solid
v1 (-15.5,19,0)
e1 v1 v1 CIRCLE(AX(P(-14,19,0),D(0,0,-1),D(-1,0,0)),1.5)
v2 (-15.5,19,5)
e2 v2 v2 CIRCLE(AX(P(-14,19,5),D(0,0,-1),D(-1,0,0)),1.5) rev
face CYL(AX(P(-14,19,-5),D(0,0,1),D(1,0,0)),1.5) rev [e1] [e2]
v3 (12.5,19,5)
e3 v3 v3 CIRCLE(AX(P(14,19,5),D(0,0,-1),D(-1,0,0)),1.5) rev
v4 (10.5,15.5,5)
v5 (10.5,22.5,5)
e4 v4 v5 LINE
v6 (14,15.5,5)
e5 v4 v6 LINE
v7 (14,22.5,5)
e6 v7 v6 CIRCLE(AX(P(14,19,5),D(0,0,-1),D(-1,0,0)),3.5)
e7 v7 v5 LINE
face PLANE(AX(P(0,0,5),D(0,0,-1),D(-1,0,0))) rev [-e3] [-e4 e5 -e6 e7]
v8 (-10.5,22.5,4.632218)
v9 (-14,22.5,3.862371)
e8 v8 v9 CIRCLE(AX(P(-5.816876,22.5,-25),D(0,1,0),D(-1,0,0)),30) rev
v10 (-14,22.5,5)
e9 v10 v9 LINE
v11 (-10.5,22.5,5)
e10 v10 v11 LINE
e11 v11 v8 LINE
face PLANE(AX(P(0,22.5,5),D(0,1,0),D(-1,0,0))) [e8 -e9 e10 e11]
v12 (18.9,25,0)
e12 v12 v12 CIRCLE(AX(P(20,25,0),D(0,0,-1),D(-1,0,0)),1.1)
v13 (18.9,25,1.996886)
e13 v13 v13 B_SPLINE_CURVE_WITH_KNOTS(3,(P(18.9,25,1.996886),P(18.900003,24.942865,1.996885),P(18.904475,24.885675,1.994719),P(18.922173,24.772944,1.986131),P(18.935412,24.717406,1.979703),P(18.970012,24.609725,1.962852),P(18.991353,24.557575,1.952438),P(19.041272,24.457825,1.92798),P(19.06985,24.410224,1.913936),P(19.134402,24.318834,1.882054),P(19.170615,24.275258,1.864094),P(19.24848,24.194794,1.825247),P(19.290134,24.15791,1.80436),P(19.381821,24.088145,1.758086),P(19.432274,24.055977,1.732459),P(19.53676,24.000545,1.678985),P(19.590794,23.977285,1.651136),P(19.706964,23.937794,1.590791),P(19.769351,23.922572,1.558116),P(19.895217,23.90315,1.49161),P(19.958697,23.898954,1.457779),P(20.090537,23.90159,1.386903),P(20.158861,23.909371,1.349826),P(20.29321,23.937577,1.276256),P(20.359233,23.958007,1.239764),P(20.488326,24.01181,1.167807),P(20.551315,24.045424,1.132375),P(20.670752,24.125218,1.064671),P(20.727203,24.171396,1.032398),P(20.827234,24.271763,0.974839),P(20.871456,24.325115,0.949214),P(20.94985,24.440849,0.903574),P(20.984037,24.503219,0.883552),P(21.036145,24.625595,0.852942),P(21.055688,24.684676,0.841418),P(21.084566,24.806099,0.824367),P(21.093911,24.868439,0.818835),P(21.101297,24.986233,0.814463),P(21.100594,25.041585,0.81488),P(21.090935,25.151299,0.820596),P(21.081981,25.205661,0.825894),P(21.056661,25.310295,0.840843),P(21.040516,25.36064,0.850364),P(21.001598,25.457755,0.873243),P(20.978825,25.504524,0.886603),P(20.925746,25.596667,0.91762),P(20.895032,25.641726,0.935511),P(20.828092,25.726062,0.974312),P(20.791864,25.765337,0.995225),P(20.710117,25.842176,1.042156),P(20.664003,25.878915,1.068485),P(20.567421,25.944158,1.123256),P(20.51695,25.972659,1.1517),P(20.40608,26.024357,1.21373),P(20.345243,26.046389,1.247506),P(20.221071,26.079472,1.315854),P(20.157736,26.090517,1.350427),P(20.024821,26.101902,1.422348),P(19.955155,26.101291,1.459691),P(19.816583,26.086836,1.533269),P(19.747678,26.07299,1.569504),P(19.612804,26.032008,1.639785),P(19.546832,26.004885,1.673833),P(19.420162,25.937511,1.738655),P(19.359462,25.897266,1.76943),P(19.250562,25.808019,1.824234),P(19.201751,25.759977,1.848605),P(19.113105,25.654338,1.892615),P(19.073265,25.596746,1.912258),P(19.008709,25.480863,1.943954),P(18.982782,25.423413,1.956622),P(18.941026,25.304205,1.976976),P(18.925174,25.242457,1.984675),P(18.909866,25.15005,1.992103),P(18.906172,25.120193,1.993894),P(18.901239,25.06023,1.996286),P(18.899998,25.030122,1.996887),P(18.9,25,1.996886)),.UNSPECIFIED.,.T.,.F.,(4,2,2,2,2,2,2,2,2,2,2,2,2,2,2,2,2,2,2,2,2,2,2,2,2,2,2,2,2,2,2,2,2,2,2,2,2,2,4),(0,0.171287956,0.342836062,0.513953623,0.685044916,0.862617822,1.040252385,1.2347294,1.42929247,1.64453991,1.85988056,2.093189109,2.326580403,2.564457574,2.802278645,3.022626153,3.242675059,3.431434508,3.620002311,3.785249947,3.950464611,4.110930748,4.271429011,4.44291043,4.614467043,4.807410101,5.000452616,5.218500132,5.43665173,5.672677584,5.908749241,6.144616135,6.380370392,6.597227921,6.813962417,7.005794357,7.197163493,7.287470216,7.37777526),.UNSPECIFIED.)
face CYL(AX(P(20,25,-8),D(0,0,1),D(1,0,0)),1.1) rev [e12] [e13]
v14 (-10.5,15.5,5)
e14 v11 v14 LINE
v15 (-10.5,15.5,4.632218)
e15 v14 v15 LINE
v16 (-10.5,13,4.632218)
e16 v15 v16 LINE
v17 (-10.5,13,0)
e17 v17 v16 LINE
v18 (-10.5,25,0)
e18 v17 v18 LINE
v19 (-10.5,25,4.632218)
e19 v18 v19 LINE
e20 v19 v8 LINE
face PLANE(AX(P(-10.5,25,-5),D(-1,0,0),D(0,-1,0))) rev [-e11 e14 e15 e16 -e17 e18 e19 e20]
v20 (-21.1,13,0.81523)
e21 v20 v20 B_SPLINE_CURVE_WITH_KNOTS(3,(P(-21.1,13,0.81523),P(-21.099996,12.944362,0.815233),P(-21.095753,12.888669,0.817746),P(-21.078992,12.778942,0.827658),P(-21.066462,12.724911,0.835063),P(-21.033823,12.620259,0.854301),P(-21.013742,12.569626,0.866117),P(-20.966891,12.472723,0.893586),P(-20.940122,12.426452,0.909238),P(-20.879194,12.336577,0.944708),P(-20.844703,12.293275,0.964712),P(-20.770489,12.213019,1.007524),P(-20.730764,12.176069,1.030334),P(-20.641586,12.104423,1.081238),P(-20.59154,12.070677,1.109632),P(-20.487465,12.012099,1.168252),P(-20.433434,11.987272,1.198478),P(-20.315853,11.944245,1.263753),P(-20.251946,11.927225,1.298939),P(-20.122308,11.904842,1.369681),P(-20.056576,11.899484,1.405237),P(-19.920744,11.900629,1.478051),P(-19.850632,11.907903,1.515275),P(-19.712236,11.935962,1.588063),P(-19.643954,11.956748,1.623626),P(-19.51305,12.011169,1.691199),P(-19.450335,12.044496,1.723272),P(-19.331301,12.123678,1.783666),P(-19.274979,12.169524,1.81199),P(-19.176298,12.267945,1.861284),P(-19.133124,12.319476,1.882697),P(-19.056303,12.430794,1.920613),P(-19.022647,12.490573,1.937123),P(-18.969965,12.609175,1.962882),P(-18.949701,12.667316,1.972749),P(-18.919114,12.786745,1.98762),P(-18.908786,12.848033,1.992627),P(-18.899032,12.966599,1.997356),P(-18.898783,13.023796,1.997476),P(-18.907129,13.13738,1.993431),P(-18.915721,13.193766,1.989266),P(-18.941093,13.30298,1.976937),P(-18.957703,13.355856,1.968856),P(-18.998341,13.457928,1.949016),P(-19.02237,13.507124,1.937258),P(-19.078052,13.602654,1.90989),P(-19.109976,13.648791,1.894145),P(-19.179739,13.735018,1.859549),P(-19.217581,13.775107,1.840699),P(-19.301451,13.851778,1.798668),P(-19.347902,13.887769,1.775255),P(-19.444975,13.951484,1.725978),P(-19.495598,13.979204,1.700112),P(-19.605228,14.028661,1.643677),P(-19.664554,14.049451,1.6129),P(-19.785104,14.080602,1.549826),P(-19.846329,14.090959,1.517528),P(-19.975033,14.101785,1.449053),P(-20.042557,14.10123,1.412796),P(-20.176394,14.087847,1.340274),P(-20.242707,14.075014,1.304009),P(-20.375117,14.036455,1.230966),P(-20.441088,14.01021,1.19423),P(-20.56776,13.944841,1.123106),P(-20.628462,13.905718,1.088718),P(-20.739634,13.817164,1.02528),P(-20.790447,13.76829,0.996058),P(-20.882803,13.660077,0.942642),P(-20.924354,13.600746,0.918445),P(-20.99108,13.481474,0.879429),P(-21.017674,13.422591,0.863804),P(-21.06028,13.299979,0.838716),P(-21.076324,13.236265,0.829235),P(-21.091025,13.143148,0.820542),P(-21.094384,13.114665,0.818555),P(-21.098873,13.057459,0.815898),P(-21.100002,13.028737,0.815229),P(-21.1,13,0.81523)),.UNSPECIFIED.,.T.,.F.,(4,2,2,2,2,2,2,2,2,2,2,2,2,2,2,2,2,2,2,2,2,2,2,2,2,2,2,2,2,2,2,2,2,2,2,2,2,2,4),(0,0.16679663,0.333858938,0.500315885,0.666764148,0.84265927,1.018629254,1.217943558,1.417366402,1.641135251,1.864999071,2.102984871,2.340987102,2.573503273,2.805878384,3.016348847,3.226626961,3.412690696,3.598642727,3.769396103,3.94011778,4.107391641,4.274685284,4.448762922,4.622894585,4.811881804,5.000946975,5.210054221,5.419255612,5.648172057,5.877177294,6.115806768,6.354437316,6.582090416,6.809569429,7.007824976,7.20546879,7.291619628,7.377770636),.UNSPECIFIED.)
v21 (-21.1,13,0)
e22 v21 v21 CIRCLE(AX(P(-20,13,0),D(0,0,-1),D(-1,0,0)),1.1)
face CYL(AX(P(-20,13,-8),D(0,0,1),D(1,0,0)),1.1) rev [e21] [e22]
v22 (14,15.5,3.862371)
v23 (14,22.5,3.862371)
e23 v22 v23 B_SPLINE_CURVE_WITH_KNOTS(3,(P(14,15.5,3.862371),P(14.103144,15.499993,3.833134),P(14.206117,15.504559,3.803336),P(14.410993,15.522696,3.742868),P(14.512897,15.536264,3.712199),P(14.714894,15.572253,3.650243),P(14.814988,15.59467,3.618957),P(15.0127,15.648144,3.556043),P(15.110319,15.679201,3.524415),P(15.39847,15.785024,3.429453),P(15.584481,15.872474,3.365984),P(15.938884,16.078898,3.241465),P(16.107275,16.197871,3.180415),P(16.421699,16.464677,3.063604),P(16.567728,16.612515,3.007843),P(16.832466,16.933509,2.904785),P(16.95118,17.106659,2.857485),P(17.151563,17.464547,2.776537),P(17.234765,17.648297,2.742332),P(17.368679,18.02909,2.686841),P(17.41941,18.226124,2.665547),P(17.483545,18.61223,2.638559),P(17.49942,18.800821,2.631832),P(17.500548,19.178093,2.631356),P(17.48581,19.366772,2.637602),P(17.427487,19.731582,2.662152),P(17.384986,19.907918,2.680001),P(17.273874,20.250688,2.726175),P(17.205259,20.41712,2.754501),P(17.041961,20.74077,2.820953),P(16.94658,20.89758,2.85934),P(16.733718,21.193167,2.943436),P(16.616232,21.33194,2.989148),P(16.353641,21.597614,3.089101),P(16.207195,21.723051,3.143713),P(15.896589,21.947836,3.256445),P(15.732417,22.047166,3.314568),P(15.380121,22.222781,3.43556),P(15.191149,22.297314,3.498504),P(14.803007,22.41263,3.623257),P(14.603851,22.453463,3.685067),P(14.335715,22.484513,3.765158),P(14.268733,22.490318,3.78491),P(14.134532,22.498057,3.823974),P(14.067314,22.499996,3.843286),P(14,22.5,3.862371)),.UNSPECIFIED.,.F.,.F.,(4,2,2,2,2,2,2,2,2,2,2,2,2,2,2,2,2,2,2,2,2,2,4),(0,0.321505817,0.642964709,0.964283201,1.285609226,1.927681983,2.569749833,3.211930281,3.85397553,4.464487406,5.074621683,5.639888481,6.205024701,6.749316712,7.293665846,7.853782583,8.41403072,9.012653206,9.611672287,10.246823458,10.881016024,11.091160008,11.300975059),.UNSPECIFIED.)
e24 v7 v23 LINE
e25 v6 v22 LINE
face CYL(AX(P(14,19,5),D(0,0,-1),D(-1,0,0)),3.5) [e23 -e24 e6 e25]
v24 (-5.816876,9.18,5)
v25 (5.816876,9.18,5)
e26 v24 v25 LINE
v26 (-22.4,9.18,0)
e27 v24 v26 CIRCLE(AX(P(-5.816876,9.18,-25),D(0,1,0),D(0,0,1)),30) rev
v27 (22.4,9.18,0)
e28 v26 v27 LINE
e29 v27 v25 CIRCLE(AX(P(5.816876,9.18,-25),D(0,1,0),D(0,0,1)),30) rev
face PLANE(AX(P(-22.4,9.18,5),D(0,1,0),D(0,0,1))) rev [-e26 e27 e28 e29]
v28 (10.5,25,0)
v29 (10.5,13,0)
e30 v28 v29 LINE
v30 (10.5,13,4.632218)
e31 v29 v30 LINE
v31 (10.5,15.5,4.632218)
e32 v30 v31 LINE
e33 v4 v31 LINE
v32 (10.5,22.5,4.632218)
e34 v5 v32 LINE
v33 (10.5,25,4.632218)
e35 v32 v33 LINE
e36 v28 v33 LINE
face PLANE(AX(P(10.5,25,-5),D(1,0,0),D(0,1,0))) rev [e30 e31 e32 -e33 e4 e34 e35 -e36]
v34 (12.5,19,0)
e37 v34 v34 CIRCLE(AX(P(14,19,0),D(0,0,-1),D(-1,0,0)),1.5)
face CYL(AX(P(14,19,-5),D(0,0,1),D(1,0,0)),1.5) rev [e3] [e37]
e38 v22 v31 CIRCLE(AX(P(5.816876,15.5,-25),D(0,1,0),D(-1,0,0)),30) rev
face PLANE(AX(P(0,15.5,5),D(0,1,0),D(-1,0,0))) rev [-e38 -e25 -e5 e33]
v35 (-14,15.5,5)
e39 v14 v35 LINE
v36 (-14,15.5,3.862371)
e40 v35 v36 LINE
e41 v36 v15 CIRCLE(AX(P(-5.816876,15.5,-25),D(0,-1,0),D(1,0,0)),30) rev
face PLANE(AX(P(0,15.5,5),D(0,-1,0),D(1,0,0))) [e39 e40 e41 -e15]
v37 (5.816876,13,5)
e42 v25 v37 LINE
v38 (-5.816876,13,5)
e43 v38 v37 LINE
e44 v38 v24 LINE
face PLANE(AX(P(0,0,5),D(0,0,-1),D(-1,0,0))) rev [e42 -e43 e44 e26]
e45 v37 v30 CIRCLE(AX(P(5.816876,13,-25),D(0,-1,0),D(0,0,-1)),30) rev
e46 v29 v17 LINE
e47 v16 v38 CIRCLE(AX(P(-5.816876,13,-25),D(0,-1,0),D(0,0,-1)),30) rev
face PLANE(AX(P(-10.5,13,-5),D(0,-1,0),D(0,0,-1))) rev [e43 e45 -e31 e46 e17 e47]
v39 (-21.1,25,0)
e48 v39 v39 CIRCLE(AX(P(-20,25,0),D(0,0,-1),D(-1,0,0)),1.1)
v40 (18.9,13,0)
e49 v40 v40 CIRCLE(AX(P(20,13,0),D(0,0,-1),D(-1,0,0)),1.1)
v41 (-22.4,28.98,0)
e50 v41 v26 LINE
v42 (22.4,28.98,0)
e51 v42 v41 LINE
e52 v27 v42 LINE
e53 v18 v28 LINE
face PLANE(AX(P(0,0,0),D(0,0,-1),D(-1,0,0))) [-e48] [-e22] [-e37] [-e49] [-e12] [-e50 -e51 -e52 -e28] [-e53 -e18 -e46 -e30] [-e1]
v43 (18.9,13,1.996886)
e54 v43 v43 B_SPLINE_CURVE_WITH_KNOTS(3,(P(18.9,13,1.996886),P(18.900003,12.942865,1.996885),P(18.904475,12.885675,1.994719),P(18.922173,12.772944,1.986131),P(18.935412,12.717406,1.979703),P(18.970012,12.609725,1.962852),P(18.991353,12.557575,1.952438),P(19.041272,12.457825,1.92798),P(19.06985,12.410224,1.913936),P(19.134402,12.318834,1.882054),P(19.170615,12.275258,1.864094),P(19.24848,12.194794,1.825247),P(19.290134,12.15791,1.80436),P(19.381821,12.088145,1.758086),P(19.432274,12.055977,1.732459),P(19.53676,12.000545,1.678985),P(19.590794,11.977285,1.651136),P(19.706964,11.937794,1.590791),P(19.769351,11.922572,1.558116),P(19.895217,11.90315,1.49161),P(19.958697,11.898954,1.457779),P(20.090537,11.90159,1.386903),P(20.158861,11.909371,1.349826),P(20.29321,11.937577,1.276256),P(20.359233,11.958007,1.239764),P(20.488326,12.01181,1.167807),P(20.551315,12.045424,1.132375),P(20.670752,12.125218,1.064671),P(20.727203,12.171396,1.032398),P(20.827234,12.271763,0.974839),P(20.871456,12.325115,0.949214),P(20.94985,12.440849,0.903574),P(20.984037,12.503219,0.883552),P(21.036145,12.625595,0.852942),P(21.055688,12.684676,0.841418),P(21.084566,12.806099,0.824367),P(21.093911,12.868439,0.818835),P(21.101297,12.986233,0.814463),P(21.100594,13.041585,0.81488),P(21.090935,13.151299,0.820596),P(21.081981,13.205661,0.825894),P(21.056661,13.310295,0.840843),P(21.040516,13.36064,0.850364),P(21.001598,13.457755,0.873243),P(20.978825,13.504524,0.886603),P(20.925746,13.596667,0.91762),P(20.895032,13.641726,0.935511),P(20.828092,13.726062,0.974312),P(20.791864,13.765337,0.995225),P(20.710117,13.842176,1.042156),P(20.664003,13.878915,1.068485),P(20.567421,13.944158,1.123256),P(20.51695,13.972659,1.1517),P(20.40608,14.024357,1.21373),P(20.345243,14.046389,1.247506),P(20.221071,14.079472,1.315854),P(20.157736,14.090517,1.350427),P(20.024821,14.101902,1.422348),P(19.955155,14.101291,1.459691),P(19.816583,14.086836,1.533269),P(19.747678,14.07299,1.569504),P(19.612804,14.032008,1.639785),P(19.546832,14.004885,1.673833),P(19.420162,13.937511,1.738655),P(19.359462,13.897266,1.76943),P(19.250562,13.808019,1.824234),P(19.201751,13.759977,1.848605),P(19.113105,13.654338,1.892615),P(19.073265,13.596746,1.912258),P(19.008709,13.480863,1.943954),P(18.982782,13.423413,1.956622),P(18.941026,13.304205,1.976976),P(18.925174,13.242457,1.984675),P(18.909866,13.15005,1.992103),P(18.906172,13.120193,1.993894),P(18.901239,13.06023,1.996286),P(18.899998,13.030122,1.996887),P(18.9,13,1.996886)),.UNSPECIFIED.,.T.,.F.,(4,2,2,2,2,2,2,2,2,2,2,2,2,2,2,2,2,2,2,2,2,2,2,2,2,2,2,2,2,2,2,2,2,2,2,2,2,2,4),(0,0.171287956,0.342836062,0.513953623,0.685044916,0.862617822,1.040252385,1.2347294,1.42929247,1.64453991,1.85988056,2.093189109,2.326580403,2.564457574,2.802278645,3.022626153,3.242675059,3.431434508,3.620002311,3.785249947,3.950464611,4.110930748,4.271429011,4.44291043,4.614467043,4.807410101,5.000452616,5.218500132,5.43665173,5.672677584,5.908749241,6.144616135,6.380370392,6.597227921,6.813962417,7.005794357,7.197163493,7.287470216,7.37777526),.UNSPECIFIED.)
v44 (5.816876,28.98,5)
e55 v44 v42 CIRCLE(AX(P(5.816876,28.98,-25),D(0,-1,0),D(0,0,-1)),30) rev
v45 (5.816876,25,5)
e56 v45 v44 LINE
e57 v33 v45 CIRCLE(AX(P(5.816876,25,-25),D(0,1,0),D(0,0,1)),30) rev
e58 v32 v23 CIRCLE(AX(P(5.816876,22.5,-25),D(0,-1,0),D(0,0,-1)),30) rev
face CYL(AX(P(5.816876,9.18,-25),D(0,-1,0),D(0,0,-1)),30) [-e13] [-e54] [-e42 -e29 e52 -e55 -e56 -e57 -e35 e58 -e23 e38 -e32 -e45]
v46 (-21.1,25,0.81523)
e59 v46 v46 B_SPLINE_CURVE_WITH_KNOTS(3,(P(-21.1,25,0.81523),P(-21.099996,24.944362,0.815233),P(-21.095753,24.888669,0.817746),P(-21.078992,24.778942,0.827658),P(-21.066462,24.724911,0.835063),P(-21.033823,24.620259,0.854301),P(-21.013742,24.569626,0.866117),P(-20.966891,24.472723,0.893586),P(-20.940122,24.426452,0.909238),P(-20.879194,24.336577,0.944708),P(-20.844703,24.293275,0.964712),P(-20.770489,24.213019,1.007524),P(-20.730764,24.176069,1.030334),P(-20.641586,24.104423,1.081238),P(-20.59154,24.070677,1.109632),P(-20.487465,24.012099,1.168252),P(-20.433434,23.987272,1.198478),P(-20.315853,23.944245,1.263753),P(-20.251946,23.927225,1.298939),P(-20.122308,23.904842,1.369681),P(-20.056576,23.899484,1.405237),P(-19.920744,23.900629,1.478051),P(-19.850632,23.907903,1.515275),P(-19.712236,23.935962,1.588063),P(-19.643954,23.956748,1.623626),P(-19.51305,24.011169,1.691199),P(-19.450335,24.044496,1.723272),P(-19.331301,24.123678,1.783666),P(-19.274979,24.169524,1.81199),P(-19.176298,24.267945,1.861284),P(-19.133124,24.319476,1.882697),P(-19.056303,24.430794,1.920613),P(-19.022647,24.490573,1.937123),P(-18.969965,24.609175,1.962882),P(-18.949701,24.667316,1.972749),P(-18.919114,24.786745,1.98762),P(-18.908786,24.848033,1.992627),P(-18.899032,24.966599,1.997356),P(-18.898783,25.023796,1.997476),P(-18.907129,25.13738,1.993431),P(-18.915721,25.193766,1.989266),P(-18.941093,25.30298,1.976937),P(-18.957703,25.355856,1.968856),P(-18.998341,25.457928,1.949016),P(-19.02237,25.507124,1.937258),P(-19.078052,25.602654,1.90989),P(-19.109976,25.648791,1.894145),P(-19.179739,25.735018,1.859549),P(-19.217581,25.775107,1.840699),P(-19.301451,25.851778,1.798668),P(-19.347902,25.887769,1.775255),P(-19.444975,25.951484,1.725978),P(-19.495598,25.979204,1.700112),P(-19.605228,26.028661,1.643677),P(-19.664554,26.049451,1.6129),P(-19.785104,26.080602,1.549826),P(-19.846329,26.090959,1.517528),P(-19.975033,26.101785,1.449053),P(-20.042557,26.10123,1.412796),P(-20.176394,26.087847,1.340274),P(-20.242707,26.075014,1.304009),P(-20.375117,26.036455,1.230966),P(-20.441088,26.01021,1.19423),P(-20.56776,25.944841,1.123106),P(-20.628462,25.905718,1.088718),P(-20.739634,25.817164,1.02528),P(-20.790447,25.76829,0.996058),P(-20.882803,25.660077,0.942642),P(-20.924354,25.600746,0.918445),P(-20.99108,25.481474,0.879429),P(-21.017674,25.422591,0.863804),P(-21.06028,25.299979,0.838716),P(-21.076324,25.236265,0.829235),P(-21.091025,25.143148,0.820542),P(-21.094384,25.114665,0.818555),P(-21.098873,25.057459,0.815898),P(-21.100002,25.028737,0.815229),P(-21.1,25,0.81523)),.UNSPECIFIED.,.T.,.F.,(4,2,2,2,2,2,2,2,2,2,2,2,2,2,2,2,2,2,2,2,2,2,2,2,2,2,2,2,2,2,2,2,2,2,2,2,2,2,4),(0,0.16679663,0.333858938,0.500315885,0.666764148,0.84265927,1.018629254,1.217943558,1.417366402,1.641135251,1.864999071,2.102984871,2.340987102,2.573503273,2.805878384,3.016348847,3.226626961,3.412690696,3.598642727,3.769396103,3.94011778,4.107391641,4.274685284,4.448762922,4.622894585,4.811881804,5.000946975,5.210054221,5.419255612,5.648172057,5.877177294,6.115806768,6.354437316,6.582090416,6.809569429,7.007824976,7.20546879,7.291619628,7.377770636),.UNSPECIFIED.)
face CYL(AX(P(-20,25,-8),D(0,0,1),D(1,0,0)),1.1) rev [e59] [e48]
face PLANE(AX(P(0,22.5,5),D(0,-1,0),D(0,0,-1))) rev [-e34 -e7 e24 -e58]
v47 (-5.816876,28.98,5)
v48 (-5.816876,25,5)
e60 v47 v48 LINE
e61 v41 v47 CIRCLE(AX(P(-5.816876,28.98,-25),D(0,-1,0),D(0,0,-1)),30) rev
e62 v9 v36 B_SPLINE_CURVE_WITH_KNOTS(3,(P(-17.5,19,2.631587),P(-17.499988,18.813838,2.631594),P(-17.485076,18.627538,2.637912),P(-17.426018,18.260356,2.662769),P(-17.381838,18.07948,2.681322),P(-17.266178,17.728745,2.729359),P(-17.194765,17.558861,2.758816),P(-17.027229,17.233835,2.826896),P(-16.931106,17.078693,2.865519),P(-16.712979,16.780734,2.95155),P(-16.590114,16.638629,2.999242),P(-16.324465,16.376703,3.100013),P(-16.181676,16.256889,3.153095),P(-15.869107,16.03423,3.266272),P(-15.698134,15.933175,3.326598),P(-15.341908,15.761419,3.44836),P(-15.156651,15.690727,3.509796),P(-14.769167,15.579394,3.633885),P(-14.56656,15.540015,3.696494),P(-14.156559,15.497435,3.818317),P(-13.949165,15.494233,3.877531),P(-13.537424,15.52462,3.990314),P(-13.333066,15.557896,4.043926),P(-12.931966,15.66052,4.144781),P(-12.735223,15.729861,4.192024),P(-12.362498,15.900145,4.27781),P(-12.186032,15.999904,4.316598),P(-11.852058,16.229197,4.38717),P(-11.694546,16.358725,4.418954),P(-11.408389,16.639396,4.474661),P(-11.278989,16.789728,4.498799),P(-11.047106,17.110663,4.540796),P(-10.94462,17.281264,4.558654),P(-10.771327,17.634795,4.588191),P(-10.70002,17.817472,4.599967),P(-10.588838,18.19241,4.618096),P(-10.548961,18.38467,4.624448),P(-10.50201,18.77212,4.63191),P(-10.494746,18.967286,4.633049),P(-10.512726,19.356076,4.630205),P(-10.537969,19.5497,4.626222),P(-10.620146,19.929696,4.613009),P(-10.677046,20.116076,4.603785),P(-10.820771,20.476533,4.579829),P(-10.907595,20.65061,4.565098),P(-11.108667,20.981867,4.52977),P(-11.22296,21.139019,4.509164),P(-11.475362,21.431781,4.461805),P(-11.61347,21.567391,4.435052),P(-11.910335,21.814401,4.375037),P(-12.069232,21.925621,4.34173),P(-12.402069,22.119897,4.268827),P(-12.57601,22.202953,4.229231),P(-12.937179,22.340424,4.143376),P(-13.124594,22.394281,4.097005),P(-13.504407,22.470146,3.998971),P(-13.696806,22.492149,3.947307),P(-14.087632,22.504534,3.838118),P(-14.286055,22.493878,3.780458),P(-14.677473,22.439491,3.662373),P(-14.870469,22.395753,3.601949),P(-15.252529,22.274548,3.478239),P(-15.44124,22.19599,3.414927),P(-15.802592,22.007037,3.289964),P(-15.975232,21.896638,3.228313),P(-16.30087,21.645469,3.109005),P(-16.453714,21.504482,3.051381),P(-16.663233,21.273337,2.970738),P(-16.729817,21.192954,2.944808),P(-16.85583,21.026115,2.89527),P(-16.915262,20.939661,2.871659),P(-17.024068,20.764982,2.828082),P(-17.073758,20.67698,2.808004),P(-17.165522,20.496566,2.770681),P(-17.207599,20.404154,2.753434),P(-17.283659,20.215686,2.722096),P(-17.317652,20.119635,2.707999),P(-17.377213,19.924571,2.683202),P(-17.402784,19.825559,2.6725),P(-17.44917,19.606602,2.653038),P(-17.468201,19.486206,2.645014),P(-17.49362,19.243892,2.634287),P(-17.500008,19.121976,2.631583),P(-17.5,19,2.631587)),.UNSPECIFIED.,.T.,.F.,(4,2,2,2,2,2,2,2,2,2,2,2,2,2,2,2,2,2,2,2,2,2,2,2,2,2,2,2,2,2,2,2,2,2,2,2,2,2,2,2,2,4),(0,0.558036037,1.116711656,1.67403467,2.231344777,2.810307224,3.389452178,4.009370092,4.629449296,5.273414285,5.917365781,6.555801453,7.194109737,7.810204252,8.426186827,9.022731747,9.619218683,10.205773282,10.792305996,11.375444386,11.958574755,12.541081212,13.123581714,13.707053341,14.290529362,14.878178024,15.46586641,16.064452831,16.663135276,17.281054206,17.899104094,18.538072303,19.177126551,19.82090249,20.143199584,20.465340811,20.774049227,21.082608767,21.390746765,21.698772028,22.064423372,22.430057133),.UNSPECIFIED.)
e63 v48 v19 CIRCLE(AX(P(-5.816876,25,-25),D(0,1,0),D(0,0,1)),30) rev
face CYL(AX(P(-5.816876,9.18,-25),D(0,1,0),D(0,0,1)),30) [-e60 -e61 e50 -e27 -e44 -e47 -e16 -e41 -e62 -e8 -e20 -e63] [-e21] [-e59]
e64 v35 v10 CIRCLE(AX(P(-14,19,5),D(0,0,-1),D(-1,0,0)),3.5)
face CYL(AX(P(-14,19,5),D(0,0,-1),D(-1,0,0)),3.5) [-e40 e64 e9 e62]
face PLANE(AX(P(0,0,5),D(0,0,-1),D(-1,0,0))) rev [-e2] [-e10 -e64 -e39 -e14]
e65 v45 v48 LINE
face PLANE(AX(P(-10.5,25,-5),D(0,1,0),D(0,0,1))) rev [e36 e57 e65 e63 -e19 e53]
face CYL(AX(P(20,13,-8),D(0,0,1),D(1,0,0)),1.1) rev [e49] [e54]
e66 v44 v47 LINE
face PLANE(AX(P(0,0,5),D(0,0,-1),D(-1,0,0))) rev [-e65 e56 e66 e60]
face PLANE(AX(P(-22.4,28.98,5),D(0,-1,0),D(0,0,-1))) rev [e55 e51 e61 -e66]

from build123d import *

# Parameters (mm, degrees)
SKETCH1_W           = 44.8
SKETCH1_H           = 19.8
BOSS_EXTRUDE1_DEPTH = 5
SKETCH2_R           = 1.1
CUT_EXTRUDE1_DEPTH  = 13
SKETCH3_R           = 1.5
CUT_EXTRUDE2_DEPTH  = 10
SKETCH4_W           = 21
SKETCH4_H           = 12
CUT_EXTRUDE3_DEPTH  = 10
FILLET1_START       = 9.18
FILLET1_DEPTH       = 19.8
BOSS_EXTRUDE2_START = -5
SKETCH5_R           = 3.5
SKETCH5_R_2         = 1.5
BOSS_EXTRUDE2_DEPTH = 5


with BuildPart() as part:
    # Sketch1 → Boss-Extrude1 (new body)
    with BuildSketch(Plane.XY):
        with Locations((0, 19.08)):
            Rectangle(SKETCH1_W, SKETCH1_H)
    extrude(amount=BOSS_EXTRUDE1_DEPTH)

    # Sketch2 → Cut-Extrude1 (cut)
    with BuildSketch(Plane.XY.offset(5)):
        with Locations((-20, 25)):
            Circle(SKETCH2_R)
        with Locations((-20, 13)):
            Circle(SKETCH2_R)
        with Locations((20, 25)):
            Circle(SKETCH2_R)
        with Locations((20, 13)):
            Circle(SKETCH2_R)
    extrude(amount=-CUT_EXTRUDE1_DEPTH, mode=Mode.SUBTRACT)

    # Sketch3 → Cut-Extrude2 (cut)
    with BuildSketch(Plane.XY.offset(5)):
        with Locations((-14, 19)):
            Circle(SKETCH3_R)
        with Locations((14, 19)):
            Circle(SKETCH3_R)
    extrude(amount=-CUT_EXTRUDE2_DEPTH, mode=Mode.SUBTRACT)

    # Sketch4 → Cut-Extrude3 (cut)
    with BuildSketch(Plane.XY.offset(5)):
        with Locations((0, 19)):
            Rectangle(SKETCH4_W, SKETCH4_H)
    extrude(amount=-CUT_EXTRUDE3_DEPTH, mode=Mode.SUBTRACT)

    # Fillet1: read off the stored shape, not the designer's step
    # Fillet1 outline → Fillet1 (cut)
    with BuildSketch(Plane(origin=(0, 0, 0), x_dir=(1, 0, 0), z_dir=(0, 1, 0)).offset(FILLET1_START)):
        with BuildLine():
            Line((22.4, -5), (22.4, 0))
            ThreePointArc((22.4, 0), (14.477130086, -3.722813233), (5.816876048, -5))
            Line((5.816876048, -5), (22.4, -5))
        make_face()
        with BuildLine():
            Line((-22.4, -5), (-5.816876048, -5))
            ThreePointArc((-5.816876048, -5), (-14.477130086, -3.722813233), (-22.4, 0))
            Line((-22.4, 0), (-22.4, -5))
        make_face()
    extrude(amount=FILLET1_DEPTH, mode=Mode.SUBTRACT)

    # Sketch5 → Boss-Extrude2 (add)
    # profile 1 of 6: a face of its own
    with BuildSketch(Plane(origin=(0, 0, 0), x_dir=(-1, 0, 0), z_dir=(0, 0, -1)).offset(BOSS_EXTRUDE2_START)):
        with Locations((-14, 19)):
            Circle(SKETCH5_R)
        with Locations((-14, 19)):
            Circle(SKETCH5_R_2, mode=Mode.SUBTRACT)
    # profile 2 of 6: a face of its own
    with BuildSketch(Plane(origin=(0, 0, 0), x_dir=(-1, 0, 0), z_dir=(0, 0, -1)).offset(BOSS_EXTRUDE2_START)):
        with BuildLine():
            Line((-10.5, 22.5), (-14, 22.5))
            ThreePointArc((-14, 22.5), (-11.525126266, 21.474873734), (-10.5, 19))
            Line((-10.5, 19), (-10.5, 22.5))
        make_face()
    # profile 3 of 6: a face of its own
    with BuildSketch(Plane(origin=(0, 0, 0), x_dir=(-1, 0, 0), z_dir=(0, 0, -1)).offset(BOSS_EXTRUDE2_START)):
        with BuildLine():
            Line((-10.5, 15.5), (-10.5, 19))
            ThreePointArc((-10.5, 19), (-11.525126266, 16.525126266), (-14, 15.5))
            Line((-14, 15.5), (-10.5, 15.5))
        make_face()
    # profile 4 of 6: a face of its own
    with BuildSketch(Plane(origin=(0, 0, 0), x_dir=(-1, 0, 0), z_dir=(0, 0, -1)).offset(BOSS_EXTRUDE2_START)):
        with Locations((14, 19)):
            Circle(SKETCH5_R)
        with Locations((14, 19)):
            Circle(SKETCH5_R_2, mode=Mode.SUBTRACT)
    # profile 5 of 6: a face of its own
    with BuildSketch(Plane(origin=(0, 0, 0), x_dir=(-1, 0, 0), z_dir=(0, 0, -1)).offset(BOSS_EXTRUDE2_START)):
        with BuildLine():
            ThreePointArc((14, 15.5), (11.525126266, 16.525126266), (10.5, 19))
            Line((10.5, 19), (10.5, 15.5))
            Line((10.5, 15.5), (14, 15.5))
        make_face()
    # profile 6 of 6: a face of its own
    with BuildSketch(Plane(origin=(0, 0, 0), x_dir=(-1, 0, 0), z_dir=(0, 0, -1)).offset(BOSS_EXTRUDE2_START)):
        with BuildLine():
            ThreePointArc((10.5, 19), (11.525126266, 21.474873734), (14, 22.5))
            Line((14, 22.5), (10.5, 22.5))
            Line((10.5, 22.5), (10.5, 19))
        make_face()
    extrude(amount=BOSS_EXTRUDE2_DEPTH)


solid = part.part
